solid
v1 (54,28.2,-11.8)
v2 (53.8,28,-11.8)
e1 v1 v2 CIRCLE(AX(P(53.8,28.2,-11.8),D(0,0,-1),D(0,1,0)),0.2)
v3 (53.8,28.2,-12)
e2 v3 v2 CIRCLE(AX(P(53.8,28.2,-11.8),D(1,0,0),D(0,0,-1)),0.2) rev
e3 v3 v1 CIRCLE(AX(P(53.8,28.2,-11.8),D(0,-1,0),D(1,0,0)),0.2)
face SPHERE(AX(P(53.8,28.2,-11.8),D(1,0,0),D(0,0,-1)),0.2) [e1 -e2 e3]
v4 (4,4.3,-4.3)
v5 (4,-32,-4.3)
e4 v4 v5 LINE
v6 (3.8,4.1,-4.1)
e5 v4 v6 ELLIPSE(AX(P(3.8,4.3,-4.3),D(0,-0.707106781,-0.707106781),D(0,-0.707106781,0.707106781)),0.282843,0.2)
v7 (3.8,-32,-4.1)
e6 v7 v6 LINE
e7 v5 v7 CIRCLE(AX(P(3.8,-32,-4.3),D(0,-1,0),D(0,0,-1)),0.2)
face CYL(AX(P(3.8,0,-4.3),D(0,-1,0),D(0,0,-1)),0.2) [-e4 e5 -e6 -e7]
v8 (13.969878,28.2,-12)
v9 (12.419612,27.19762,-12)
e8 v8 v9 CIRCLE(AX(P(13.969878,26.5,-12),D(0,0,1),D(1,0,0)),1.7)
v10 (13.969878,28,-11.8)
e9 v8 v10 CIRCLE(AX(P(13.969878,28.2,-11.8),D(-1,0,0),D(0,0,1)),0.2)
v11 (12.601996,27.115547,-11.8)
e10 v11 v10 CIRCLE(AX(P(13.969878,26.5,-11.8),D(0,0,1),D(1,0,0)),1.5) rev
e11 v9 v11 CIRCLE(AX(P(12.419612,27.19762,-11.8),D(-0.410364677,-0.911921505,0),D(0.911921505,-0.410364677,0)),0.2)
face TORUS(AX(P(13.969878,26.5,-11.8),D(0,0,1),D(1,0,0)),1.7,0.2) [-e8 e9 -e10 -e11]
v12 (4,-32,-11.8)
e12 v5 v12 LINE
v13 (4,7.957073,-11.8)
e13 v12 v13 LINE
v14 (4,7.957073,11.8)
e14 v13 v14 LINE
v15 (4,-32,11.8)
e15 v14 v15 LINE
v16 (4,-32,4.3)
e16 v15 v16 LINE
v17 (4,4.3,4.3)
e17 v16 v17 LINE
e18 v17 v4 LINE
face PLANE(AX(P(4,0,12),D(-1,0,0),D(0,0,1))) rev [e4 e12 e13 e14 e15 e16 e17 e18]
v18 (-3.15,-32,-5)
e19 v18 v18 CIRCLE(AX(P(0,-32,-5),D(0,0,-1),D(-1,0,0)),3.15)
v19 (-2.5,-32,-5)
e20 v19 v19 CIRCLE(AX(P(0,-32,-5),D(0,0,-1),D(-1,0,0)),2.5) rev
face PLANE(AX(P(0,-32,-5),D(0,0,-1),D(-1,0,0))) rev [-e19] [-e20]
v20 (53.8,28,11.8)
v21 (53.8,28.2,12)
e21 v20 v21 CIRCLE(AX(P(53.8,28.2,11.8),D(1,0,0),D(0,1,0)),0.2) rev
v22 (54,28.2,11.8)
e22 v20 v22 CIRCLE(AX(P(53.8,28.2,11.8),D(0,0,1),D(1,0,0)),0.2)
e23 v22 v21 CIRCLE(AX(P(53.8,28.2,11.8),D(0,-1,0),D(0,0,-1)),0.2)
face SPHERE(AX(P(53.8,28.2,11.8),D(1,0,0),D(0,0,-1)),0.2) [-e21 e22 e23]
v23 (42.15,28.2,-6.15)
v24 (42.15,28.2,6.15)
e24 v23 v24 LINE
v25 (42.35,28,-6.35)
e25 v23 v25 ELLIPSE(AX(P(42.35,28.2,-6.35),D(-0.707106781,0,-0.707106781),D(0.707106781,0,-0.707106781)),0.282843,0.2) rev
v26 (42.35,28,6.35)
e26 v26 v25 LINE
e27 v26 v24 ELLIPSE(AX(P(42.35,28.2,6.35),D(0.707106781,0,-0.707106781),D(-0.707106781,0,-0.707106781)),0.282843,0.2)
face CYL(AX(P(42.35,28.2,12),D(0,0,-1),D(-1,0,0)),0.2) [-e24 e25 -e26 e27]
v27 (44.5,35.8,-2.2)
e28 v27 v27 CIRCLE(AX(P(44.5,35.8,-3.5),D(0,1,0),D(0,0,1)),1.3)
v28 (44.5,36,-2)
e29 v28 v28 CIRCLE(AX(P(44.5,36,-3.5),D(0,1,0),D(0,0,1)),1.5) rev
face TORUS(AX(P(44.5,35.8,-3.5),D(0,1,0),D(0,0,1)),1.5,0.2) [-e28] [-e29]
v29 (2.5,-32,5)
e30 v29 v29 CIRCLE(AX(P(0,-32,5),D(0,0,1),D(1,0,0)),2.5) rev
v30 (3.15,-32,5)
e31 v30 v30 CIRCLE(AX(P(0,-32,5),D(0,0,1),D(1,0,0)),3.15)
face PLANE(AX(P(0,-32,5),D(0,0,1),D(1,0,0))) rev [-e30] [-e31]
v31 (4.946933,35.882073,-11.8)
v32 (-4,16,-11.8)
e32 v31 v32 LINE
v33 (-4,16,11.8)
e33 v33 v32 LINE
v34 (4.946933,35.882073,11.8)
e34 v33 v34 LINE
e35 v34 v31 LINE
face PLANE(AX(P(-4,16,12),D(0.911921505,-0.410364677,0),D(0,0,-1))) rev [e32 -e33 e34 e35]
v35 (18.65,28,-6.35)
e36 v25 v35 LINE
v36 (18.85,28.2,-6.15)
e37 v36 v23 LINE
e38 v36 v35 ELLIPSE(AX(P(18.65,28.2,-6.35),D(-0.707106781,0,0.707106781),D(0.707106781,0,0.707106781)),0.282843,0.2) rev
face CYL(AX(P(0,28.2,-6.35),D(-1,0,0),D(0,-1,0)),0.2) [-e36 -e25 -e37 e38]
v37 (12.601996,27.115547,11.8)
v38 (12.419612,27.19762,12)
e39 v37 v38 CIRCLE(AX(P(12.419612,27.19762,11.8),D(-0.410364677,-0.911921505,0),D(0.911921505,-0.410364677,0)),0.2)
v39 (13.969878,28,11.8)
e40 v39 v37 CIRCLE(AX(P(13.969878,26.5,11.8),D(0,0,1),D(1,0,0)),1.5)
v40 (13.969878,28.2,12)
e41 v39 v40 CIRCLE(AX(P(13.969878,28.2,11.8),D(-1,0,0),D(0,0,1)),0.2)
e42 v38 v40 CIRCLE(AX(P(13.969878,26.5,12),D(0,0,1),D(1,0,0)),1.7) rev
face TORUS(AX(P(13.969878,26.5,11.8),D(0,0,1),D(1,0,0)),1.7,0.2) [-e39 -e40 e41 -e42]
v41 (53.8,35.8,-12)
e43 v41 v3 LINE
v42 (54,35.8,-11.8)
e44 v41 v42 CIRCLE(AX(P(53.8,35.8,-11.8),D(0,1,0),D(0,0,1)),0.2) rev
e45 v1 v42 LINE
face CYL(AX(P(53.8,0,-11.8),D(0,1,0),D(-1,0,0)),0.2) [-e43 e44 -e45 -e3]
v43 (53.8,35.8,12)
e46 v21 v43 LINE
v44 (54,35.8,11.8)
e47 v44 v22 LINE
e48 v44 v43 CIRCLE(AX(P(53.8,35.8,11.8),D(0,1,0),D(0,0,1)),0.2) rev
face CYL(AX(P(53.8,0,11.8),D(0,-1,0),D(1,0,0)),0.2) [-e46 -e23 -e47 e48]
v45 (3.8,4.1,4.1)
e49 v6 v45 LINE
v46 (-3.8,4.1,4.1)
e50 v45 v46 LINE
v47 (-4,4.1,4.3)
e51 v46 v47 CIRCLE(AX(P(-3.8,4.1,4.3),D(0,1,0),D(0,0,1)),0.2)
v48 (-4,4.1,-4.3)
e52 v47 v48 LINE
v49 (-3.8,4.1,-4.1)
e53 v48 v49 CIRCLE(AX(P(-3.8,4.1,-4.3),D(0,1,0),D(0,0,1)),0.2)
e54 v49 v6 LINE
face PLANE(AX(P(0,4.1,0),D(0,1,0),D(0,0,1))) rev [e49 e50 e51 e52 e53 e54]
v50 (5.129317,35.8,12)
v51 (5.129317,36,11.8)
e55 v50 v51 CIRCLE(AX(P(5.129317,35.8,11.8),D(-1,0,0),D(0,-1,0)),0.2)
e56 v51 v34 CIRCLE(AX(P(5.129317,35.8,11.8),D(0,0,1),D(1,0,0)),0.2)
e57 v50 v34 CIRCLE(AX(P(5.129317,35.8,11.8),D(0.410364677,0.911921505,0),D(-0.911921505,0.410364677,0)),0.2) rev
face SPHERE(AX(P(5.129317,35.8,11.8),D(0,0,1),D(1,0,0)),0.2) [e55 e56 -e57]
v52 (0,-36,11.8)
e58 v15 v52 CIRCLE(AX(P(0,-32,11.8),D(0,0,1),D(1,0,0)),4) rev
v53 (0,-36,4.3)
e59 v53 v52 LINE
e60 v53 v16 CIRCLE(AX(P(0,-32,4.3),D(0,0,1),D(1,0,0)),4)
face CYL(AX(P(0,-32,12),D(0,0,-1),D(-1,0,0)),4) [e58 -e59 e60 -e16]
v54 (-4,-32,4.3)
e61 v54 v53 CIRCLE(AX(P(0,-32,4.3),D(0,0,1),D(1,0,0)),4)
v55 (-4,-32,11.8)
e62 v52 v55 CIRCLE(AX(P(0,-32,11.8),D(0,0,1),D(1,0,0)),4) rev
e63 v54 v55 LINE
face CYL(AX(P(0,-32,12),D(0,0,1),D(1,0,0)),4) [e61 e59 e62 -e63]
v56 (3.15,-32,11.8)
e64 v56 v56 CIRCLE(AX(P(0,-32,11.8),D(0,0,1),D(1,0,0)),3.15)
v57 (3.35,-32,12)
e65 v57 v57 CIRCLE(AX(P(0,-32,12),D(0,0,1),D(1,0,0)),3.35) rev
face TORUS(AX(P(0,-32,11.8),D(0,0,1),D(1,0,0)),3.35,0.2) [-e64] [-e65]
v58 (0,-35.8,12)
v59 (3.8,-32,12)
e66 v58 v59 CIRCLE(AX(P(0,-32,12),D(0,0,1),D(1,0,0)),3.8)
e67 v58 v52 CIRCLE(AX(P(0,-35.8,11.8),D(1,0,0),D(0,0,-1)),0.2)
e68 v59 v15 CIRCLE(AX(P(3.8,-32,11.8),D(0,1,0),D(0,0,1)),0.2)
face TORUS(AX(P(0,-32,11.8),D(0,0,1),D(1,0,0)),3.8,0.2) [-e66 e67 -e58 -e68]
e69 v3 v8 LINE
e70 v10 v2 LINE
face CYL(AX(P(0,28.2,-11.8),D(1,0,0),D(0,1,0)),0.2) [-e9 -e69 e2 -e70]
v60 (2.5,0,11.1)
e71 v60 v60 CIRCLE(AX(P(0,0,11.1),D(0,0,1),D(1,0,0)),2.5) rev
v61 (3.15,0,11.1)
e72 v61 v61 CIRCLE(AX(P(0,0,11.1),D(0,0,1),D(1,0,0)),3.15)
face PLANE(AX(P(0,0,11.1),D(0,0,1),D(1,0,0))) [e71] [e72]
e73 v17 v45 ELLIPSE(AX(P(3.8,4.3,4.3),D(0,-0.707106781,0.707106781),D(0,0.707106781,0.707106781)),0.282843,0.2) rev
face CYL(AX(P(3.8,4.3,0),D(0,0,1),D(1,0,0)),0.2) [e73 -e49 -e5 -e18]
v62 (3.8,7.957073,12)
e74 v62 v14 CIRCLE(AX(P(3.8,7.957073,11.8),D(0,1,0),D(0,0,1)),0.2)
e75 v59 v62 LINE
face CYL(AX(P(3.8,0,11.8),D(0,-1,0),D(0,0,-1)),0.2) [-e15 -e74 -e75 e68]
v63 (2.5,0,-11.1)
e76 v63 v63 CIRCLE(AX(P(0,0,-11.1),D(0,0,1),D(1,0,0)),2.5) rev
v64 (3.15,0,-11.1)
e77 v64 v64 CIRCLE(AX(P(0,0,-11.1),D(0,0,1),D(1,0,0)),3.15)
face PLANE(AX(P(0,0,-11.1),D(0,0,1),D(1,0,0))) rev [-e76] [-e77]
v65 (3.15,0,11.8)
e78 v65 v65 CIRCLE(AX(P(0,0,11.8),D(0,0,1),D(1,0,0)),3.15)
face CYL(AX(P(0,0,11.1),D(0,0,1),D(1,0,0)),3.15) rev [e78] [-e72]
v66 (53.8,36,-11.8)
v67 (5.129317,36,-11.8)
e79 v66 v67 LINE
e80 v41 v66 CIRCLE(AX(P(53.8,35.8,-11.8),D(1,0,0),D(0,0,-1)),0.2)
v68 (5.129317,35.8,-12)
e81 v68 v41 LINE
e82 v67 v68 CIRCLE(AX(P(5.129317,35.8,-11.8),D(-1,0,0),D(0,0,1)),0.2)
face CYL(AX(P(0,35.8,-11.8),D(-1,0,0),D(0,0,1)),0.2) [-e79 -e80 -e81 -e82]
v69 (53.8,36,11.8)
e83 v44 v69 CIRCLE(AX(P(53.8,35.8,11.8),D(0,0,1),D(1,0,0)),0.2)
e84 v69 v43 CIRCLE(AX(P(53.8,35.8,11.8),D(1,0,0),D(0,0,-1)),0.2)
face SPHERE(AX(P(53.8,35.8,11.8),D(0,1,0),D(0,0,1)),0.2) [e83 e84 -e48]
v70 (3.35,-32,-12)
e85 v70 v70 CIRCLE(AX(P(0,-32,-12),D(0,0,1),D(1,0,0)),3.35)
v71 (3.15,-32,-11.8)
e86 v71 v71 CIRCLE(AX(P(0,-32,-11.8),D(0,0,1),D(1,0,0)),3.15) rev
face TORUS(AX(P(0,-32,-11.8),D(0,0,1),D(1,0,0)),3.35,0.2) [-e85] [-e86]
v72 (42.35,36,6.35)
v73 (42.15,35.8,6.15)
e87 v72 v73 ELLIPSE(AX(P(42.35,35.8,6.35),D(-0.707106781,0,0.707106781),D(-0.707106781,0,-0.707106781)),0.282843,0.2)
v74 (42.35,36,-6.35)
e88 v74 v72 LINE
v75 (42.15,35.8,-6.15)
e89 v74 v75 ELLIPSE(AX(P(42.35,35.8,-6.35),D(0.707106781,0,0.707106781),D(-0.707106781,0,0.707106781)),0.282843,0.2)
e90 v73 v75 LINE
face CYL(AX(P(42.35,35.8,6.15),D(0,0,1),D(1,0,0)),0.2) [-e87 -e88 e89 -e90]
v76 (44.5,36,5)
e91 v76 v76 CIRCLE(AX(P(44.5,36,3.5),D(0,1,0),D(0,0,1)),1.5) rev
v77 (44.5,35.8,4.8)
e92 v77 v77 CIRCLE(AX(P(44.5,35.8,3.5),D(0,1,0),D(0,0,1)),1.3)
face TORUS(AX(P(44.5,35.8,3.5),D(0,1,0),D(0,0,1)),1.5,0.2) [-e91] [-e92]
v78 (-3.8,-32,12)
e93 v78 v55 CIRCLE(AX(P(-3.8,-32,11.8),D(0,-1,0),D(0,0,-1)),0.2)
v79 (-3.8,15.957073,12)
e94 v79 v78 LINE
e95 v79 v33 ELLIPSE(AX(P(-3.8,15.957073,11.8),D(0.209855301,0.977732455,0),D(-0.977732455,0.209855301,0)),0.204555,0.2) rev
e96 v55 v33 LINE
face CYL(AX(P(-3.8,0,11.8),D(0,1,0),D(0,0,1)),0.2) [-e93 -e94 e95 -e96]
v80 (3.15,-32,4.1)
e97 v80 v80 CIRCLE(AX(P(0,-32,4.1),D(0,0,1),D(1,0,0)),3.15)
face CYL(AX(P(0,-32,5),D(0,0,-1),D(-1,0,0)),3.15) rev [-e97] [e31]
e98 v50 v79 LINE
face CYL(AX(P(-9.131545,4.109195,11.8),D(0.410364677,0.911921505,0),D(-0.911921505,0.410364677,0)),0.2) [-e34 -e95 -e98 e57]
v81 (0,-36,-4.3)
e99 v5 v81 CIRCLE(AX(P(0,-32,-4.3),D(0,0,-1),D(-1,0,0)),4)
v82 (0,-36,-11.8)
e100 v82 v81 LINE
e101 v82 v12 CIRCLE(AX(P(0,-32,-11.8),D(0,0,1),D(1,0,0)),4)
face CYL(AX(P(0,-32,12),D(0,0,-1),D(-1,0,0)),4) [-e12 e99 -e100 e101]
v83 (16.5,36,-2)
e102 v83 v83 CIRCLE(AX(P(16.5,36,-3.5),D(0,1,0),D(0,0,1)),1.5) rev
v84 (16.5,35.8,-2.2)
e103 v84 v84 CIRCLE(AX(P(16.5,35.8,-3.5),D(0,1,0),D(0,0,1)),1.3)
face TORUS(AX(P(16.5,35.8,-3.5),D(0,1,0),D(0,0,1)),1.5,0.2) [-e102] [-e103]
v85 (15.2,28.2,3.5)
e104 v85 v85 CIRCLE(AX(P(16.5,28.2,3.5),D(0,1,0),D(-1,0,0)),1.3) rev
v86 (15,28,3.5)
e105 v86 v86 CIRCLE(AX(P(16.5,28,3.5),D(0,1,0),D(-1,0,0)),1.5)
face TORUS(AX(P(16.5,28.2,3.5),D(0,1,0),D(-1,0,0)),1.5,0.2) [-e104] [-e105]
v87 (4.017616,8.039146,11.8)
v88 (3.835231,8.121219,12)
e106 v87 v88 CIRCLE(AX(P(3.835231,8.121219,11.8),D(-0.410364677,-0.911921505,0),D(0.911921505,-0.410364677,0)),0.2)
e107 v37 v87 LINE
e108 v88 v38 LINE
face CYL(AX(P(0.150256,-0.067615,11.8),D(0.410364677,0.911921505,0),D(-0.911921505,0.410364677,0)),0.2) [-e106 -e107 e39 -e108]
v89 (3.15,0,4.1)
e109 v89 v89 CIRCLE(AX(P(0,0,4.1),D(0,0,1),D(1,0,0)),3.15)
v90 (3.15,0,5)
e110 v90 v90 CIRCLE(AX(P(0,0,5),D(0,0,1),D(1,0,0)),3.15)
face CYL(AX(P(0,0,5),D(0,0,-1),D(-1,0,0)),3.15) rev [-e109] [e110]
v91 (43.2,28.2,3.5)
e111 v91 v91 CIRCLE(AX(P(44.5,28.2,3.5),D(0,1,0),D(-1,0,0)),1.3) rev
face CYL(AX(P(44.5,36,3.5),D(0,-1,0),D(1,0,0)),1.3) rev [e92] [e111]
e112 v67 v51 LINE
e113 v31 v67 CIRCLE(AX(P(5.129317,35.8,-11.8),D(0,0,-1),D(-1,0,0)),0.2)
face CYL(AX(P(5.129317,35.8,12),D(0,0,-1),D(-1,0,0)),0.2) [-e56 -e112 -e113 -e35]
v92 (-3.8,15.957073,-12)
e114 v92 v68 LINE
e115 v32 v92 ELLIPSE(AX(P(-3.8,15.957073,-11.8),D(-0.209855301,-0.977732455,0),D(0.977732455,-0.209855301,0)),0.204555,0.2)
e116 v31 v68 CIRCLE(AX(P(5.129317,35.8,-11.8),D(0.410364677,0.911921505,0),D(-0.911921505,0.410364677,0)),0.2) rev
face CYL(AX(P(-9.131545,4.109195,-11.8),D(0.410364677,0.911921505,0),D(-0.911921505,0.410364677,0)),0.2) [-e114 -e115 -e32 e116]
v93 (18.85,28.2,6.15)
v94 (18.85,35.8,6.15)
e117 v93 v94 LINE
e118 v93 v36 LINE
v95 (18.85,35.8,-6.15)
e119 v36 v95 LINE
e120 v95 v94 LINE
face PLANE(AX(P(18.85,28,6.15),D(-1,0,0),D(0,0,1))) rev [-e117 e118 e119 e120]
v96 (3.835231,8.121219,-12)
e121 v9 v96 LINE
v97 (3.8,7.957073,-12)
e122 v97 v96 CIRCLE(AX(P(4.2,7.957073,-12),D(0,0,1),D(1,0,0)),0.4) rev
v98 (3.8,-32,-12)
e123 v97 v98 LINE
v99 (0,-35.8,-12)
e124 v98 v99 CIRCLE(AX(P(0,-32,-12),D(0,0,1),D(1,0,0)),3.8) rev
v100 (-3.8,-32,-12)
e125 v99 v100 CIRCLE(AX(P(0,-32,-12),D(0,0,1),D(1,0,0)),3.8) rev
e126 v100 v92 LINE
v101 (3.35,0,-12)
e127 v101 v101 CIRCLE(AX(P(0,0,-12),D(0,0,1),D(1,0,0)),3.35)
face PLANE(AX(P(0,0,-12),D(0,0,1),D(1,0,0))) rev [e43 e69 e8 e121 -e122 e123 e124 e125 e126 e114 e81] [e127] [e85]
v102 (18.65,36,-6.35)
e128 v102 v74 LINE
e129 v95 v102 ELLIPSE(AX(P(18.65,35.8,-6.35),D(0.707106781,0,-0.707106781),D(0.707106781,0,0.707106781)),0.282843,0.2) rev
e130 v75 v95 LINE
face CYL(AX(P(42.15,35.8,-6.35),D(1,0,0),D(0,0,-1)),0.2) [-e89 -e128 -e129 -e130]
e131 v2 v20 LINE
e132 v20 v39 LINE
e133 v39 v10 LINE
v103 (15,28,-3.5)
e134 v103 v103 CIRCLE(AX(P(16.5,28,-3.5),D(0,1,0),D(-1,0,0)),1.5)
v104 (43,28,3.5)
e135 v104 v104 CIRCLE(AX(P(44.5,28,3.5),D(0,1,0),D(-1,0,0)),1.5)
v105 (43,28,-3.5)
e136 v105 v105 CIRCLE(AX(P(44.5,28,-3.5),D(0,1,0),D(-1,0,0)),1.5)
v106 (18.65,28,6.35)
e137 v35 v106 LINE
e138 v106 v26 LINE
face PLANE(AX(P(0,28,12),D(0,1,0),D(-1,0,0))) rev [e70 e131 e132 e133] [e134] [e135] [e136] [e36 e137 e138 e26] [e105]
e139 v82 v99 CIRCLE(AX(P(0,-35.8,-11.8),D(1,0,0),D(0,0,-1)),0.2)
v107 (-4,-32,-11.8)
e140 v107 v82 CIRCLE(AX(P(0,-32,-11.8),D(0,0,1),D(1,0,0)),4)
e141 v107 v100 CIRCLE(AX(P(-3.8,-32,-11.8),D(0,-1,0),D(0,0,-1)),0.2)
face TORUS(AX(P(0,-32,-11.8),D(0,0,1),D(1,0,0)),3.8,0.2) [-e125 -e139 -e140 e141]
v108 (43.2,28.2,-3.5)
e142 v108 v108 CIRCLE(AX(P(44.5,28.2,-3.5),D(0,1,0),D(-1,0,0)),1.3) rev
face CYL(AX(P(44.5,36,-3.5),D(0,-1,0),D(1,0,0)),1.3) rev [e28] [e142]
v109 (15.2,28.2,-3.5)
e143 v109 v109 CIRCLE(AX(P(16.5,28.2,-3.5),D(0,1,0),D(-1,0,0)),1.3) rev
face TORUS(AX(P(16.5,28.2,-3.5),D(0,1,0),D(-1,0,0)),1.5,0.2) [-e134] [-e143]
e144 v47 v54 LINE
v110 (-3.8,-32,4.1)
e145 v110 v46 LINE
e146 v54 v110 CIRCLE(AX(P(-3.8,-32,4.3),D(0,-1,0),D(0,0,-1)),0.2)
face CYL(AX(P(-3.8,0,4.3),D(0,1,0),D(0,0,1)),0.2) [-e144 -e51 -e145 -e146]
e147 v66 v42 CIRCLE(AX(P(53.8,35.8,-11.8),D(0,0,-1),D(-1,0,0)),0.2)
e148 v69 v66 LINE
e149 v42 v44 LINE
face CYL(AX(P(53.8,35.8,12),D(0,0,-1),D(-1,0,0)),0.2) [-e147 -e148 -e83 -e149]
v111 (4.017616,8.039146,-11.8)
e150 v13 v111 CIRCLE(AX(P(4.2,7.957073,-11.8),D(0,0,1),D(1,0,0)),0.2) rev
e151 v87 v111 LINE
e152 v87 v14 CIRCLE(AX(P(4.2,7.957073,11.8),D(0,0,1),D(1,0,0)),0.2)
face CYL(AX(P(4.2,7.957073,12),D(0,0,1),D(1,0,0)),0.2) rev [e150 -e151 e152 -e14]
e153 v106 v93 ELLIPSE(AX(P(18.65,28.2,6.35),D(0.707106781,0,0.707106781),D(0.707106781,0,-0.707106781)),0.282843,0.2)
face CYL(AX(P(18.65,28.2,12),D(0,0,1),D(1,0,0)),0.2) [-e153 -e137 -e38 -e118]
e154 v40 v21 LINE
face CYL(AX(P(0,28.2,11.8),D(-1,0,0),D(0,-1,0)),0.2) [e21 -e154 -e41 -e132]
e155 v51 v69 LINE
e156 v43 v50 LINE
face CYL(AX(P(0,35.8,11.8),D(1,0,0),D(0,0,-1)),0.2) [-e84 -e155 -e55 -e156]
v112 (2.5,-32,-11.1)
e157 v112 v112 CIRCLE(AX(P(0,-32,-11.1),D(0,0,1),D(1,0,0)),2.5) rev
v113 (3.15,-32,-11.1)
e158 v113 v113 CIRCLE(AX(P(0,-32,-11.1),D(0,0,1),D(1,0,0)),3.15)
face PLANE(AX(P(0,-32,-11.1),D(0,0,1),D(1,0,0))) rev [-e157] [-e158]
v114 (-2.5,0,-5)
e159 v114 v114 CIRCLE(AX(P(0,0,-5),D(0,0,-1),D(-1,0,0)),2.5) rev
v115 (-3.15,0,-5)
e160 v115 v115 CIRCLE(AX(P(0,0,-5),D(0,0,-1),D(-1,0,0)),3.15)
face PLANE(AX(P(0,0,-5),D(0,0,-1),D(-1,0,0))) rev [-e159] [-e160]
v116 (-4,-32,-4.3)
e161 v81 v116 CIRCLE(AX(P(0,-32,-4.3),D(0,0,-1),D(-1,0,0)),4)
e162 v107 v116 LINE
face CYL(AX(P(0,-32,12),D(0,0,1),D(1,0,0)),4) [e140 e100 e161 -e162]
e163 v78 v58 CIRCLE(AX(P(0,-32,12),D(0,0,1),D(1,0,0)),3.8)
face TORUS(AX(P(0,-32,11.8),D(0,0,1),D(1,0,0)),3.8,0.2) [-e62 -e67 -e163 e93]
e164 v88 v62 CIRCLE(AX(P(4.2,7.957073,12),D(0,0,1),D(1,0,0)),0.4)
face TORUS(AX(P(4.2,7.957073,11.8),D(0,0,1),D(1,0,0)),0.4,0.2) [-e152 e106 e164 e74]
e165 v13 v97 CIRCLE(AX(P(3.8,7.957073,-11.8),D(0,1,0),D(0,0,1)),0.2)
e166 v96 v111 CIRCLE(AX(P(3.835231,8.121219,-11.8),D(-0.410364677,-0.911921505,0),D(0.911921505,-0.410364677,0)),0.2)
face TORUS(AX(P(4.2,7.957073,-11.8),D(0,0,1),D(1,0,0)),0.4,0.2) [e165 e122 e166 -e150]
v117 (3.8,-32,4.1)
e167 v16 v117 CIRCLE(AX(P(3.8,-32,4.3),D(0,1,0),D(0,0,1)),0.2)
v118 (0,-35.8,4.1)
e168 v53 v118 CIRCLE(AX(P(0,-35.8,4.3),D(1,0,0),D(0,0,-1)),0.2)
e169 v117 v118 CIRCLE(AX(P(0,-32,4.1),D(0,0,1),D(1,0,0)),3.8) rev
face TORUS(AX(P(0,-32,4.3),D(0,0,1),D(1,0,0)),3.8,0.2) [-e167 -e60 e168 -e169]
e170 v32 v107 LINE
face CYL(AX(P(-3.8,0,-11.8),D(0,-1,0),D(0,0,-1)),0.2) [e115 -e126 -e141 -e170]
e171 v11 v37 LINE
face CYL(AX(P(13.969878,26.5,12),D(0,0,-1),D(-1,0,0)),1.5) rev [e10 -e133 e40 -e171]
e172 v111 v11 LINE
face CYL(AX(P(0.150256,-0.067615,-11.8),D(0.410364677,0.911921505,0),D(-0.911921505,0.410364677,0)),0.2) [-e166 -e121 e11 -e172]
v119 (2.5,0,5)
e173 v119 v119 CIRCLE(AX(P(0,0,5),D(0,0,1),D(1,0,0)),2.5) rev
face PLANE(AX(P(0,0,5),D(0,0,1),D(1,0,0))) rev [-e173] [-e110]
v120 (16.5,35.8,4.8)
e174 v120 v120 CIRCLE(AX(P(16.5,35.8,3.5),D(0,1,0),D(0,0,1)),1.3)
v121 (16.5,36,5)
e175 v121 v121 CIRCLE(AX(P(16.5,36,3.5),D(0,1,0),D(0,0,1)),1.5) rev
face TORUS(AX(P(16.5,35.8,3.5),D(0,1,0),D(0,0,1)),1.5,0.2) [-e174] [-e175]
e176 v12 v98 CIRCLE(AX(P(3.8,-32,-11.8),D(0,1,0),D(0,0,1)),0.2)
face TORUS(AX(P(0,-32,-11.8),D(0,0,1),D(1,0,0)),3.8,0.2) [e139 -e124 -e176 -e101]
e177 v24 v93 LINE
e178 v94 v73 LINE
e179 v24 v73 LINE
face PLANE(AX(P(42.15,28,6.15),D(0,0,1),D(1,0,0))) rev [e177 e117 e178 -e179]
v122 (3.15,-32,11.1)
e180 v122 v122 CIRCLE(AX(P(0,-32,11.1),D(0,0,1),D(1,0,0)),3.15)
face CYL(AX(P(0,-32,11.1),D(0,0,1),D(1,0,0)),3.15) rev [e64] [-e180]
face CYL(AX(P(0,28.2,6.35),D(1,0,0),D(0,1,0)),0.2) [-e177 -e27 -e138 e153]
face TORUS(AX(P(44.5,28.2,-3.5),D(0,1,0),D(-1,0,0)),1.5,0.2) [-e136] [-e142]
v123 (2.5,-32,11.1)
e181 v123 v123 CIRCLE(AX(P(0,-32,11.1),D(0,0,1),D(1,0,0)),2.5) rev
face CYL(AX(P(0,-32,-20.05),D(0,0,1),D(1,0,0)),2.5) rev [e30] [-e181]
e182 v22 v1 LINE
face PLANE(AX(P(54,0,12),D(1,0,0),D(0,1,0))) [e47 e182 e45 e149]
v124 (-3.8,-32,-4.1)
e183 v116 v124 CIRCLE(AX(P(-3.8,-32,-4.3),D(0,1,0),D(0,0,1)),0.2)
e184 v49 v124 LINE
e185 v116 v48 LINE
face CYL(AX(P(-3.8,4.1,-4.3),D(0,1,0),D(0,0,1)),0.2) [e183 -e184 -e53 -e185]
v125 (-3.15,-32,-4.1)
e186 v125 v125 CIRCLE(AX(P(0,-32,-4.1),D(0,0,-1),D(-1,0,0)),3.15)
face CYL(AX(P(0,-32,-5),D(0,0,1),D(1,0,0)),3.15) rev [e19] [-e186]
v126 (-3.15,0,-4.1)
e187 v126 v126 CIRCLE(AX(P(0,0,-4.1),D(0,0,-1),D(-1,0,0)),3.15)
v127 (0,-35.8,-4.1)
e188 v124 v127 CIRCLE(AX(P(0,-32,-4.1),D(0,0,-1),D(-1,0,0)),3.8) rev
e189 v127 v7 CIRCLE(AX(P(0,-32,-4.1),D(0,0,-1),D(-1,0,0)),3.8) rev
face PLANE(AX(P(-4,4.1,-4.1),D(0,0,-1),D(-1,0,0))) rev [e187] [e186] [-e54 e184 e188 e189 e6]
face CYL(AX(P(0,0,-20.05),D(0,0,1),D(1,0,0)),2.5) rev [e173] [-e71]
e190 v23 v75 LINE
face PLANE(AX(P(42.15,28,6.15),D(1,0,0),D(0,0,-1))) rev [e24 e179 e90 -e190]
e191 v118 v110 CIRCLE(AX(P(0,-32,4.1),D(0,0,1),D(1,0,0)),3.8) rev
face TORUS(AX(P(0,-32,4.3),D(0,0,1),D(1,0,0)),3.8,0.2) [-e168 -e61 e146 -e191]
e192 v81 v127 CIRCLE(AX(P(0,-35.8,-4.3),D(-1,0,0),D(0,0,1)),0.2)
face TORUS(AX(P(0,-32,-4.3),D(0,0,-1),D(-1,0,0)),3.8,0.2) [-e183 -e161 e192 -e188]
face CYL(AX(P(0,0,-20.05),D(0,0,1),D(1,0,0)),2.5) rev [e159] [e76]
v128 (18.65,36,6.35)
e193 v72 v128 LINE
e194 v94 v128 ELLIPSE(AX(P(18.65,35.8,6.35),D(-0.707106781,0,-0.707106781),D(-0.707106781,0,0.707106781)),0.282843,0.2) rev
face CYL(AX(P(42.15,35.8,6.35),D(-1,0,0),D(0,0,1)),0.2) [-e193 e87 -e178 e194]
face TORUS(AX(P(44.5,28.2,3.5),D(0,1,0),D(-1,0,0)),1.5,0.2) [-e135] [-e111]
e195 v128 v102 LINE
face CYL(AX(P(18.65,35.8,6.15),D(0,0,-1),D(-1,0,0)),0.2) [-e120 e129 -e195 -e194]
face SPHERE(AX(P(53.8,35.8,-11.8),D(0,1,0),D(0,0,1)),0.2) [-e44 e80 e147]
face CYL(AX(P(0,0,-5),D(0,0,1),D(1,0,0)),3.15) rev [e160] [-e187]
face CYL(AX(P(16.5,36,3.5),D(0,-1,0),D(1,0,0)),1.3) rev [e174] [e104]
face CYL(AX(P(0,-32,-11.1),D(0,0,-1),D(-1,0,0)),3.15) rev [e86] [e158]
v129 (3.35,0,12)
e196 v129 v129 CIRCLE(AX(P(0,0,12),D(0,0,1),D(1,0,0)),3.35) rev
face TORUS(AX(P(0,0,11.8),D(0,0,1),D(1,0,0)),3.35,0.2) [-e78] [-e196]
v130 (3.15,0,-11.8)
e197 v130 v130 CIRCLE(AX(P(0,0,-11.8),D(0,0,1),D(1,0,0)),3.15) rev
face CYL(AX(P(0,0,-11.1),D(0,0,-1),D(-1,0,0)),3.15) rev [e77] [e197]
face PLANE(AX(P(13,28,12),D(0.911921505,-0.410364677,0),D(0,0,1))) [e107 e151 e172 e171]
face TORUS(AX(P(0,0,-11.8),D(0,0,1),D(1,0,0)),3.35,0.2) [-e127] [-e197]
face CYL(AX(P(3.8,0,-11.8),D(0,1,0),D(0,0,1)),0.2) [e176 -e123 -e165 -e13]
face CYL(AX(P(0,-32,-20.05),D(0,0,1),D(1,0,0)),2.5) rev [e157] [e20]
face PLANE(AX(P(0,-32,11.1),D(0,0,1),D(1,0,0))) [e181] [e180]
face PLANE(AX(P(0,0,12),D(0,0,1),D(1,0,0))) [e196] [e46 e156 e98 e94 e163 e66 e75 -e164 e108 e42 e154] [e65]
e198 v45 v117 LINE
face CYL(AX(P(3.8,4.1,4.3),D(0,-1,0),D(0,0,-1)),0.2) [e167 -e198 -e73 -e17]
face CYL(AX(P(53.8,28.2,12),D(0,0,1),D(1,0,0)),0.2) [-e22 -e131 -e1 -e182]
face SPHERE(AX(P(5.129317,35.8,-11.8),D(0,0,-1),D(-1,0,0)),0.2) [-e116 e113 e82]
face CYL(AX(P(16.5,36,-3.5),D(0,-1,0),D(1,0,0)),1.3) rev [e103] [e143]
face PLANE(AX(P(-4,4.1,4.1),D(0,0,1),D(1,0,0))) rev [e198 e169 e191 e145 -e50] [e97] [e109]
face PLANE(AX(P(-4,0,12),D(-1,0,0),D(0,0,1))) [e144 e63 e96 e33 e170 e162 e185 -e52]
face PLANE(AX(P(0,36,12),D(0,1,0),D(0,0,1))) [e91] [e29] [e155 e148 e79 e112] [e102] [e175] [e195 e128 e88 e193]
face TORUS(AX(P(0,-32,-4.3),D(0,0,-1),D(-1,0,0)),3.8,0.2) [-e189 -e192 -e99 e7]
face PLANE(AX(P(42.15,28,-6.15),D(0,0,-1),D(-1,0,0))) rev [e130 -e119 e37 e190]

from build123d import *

# Parameters (mm, degrees)
SKETCH_1_W          = 8
SKETCH_1_H          = 72
SKETCH_1_W_2        = 50
SKETCH_1_H_2        = 8
EXTRUDE_1_DEPTH     = 12
SKETCH_2_W          = 8
SKETCH_2_H          = 8.2
CUT_EXTRUDE_1_DEPTH = 40.1
SKETCH_3_R          = 2.5
CUT_EXTRUDE_2_DEPTH = 20.05
SKETCH_4_R          = 3.15
CUT_EXTRUDE_3_DEPTH = 0.9
CUT_EXTRUDE_START   = -7
SKETCH_4_2_R        = 3.15
CUT_EXTRUDE_4_DEPTH = 0.9
CUT_EXTRUDE_START_2 = -16.1
SKETCH_4_3_R        = 3.15
CUT_EXTRUDE_5_DEPTH = 0.9
CUT_EXTRUDE_START_3 = -23.1
SKETCH_4_4_R        = 3.15
CUT_EXTRUDE_6_DEPTH = 0.9
SKETCH_5_W          = 23.3
SKETCH_5_H          = 12.3
CUT_EXTRUDE_7_DEPTH = 8
SKETCH_6_R          = 1.3
CUT_EXTRUDE_8_DEPTH = 8
CHAMFER_1_SIZE      = 20
CHAMFER_1_SIZE2     = 9
CHAMFER_2_SIZE      = 9
CHAMFER_2_SIZE2     = 20
FILLET_4_R          = 1.5
FILLET_2_R          = 4
FILLET_3_R          = 0.2


with BuildPart() as part:
    # 草图1 → 凸台-拉伸1 (new, symmetric)
    with BuildSketch(Plane.XY):
        Rectangle(SKETCH_1_W, SKETCH_1_H)
        with Locations((29, 32)):
            Rectangle(SKETCH_1_W_2, SKETCH_1_H_2)
    extrude(amount=EXTRUDE_1_DEPTH, both=True)

    # 草图2 → 切除-拉伸1 (cut)
    with BuildSketch(Plane.XZ.offset(36)):
        Rectangle(SKETCH_2_W, SKETCH_2_H)
    extrude(amount=-CUT_EXTRUDE_1_DEPTH, mode=Mode.SUBTRACT)

    # 草图3 → 切除-拉伸2 (cut, symmetric)
    with BuildSketch(Plane.XY):
        Circle(SKETCH_3_R)
        with Locations((0, -32)):
            Circle(SKETCH_3_R)
    extrude(amount=CUT_EXTRUDE_2_DEPTH, both=True, mode=Mode.SUBTRACT)

    # 草图4 → 切除-拉伸3 (cut)
    with BuildSketch(Plane.XY.offset(12)):
        Circle(SKETCH_4_R)
        with Locations((0, -32)):
            Circle(SKETCH_4_R)
    extrude(amount=-CUT_EXTRUDE_3_DEPTH, mode=Mode.SUBTRACT)

    # 草图4<2> → 切除-拉伸4 (cut)
    with BuildSketch(Plane.XY.offset(12).offset(CUT_EXTRUDE_START)):
        Circle(SKETCH_4_2_R)
        with Locations((0, -32)):
            Circle(SKETCH_4_2_R)
    extrude(amount=-CUT_EXTRUDE_4_DEPTH, mode=Mode.SUBTRACT)

    # 草图4<3> → 切除-拉伸5 (cut)
    with BuildSketch(Plane.XY.offset(12).offset(CUT_EXTRUDE_START_2)):
        Circle(SKETCH_4_3_R)
        with Locations((0, -32)):
            Circle(SKETCH_4_3_R)
    extrude(amount=-CUT_EXTRUDE_5_DEPTH, mode=Mode.SUBTRACT)

    # 草图4<4> → 切除-拉伸6 (cut)
    with BuildSketch(Plane.XY.offset(12).offset(CUT_EXTRUDE_START_3)):
        Circle(SKETCH_4_4_R)
        with Locations((0, -32)):
            Circle(SKETCH_4_4_R)
    extrude(amount=-CUT_EXTRUDE_6_DEPTH, mode=Mode.SUBTRACT)

    # 草图5 → 切除-拉伸7 (cut)
    with BuildSketch(Plane(origin=(0, 36, 0), x_dir=(1, 0, 0), z_dir=(0, 1, 0))):
        with Locations((30.5, 0)):
            Rectangle(SKETCH_5_W, SKETCH_5_H)
    extrude(amount=-CUT_EXTRUDE_7_DEPTH, mode=Mode.SUBTRACT)

    # 草图6 → 切除-拉伸8 (cut)
    with BuildSketch(Plane.XZ.offset(-28)):
        with Locations((44.5, 3.5)):
            Circle(SKETCH_6_R)
        with Locations((44.5, -3.5)):
            Circle(SKETCH_6_R)
        with Locations((16.5, 3.5)):
            Circle(SKETCH_6_R)
        with Locations((16.5, -3.5)):
            Circle(SKETCH_6_R)
    extrude(amount=-CUT_EXTRUDE_8_DEPTH, mode=Mode.SUBTRACT)

    # 倒角1
    chamfer_1_edges = [part.edges().sort_by_distance(p)[0] for p in [
        (4, 28, 0),
    ]]
    chamfer_1_side = [part.faces().sort_by_distance(p)[0] for p in [
        (4, -35.3164797, -8.05),
    ]]
    chamfer(chamfer_1_edges, length=CHAMFER_1_SIZE, length2=CHAMFER_1_SIZE2, reference=chamfer_1_side[0])

    # 倒角2
    chamfer_2_edges = [part.edges().sort_by_distance(p)[0] for p in [
        (-4, 36, 0),
    ]]
    chamfer_2_side = [part.faces().sort_by_distance(p)[0] for p in [
        (25, 36, -11.372305807),
    ]]
    chamfer(chamfer_2_edges, length=CHAMFER_2_SIZE, length2=CHAMFER_2_SIZE2, reference=chamfer_2_side[0])

    # 圆角4
    fillet_4_edges = [part.edges().sort_by_distance(p)[0] for p in [
        (13, 28, 0),
    ]]
    fillet(fillet_4_edges, radius=FILLET_4_R)

    # 圆角2
    fillet_2_edges = [part.edges().sort_by_distance(p)[0] for p in [
        (-4, -36, 8.05),
        (4, -36, 8.05),
        (-4, -36, -8.05),
        (4, -36, -8.05),
    ]]
    fillet(fillet_2_edges, radius=FILLET_2_R - 0.0001)  # a hair under: the kernel refuses the full size

    # 圆角3
    fillet_3_edges = [part.edges().sort_by_distance(p)[0] for p in [
        (-3.15, 0, -12),
        (-3.15, -32, -12),
        (18.85, 28, 0),
        (30.5, 28, -6.15),
        (42.15, 28, 0),
        (30.5, 28, 6.15),
        (18.85, 36, 0),
        (30.5, 36, 6.15),
        (42.15, 36, 0),
        (30.5, 36, -6.15),
        (54, 36, 0),
        (43.2, 36, -3.5),
        (43.2, 28, -3.5),
        (54, 28, 0),
        (15.2, 36, 3.5),
        (15.2, 28, 3.5),
        (15.2, 36, -3.5),
        (15.2, 28, -3.5),
        (43.2, 36, 3.5),
        (43.2, 28, 3.5),
        (4, 8, 0),
        (8.300998079, 17.557773508, 12),
        (29.5, 36, -12),
        (0.5, 26, -12),
        (29.5, 36, 12),
        (5, 36, 0),
        (0.5, 26, 12),
        (33.984939207, 28, 12),
        (33.984939207, 28, -12),
        (8.300998079, 17.557773508, -12),
        (13.155421702, 27.759627033, -12),
        (13.155421702, 27.759627033, 12),
        (2.828456414, -34.828456414, 4.1),
        (-2.828456414, -34.828456414, 4.1),
        (-4, -8.00005, 12),
        (-4, -8.00005, -12),
        (4, -12.00005, 12),
        (2.828456414, -34.828456414, 12),
        (-2.828456414, -34.828456414, 12),
        (4, -12.00005, -12),
        (2.828456414, -34.828456414, -12),
        (-2.828456414, -34.828456414, -12),
        (2.828456414, -34.828456414, -4.1),
        (-2.828456414, -34.828456414, -4.1),
        (54, 32, 12),
        (4, 4.1, 0),
        (4, -13.95005, 4.1),
        (4, -13.95005, -4.1),
        (-4, -13.95005, -4.1),
        (-4, -13.95005, 4.1),
        (-3.15, 0, 12),
        (-3.15, -32, 12),
        (54, 32, -12),
    ]]
    fillet(fillet_3_edges, radius=FILLET_3_R)


solid = part.part
